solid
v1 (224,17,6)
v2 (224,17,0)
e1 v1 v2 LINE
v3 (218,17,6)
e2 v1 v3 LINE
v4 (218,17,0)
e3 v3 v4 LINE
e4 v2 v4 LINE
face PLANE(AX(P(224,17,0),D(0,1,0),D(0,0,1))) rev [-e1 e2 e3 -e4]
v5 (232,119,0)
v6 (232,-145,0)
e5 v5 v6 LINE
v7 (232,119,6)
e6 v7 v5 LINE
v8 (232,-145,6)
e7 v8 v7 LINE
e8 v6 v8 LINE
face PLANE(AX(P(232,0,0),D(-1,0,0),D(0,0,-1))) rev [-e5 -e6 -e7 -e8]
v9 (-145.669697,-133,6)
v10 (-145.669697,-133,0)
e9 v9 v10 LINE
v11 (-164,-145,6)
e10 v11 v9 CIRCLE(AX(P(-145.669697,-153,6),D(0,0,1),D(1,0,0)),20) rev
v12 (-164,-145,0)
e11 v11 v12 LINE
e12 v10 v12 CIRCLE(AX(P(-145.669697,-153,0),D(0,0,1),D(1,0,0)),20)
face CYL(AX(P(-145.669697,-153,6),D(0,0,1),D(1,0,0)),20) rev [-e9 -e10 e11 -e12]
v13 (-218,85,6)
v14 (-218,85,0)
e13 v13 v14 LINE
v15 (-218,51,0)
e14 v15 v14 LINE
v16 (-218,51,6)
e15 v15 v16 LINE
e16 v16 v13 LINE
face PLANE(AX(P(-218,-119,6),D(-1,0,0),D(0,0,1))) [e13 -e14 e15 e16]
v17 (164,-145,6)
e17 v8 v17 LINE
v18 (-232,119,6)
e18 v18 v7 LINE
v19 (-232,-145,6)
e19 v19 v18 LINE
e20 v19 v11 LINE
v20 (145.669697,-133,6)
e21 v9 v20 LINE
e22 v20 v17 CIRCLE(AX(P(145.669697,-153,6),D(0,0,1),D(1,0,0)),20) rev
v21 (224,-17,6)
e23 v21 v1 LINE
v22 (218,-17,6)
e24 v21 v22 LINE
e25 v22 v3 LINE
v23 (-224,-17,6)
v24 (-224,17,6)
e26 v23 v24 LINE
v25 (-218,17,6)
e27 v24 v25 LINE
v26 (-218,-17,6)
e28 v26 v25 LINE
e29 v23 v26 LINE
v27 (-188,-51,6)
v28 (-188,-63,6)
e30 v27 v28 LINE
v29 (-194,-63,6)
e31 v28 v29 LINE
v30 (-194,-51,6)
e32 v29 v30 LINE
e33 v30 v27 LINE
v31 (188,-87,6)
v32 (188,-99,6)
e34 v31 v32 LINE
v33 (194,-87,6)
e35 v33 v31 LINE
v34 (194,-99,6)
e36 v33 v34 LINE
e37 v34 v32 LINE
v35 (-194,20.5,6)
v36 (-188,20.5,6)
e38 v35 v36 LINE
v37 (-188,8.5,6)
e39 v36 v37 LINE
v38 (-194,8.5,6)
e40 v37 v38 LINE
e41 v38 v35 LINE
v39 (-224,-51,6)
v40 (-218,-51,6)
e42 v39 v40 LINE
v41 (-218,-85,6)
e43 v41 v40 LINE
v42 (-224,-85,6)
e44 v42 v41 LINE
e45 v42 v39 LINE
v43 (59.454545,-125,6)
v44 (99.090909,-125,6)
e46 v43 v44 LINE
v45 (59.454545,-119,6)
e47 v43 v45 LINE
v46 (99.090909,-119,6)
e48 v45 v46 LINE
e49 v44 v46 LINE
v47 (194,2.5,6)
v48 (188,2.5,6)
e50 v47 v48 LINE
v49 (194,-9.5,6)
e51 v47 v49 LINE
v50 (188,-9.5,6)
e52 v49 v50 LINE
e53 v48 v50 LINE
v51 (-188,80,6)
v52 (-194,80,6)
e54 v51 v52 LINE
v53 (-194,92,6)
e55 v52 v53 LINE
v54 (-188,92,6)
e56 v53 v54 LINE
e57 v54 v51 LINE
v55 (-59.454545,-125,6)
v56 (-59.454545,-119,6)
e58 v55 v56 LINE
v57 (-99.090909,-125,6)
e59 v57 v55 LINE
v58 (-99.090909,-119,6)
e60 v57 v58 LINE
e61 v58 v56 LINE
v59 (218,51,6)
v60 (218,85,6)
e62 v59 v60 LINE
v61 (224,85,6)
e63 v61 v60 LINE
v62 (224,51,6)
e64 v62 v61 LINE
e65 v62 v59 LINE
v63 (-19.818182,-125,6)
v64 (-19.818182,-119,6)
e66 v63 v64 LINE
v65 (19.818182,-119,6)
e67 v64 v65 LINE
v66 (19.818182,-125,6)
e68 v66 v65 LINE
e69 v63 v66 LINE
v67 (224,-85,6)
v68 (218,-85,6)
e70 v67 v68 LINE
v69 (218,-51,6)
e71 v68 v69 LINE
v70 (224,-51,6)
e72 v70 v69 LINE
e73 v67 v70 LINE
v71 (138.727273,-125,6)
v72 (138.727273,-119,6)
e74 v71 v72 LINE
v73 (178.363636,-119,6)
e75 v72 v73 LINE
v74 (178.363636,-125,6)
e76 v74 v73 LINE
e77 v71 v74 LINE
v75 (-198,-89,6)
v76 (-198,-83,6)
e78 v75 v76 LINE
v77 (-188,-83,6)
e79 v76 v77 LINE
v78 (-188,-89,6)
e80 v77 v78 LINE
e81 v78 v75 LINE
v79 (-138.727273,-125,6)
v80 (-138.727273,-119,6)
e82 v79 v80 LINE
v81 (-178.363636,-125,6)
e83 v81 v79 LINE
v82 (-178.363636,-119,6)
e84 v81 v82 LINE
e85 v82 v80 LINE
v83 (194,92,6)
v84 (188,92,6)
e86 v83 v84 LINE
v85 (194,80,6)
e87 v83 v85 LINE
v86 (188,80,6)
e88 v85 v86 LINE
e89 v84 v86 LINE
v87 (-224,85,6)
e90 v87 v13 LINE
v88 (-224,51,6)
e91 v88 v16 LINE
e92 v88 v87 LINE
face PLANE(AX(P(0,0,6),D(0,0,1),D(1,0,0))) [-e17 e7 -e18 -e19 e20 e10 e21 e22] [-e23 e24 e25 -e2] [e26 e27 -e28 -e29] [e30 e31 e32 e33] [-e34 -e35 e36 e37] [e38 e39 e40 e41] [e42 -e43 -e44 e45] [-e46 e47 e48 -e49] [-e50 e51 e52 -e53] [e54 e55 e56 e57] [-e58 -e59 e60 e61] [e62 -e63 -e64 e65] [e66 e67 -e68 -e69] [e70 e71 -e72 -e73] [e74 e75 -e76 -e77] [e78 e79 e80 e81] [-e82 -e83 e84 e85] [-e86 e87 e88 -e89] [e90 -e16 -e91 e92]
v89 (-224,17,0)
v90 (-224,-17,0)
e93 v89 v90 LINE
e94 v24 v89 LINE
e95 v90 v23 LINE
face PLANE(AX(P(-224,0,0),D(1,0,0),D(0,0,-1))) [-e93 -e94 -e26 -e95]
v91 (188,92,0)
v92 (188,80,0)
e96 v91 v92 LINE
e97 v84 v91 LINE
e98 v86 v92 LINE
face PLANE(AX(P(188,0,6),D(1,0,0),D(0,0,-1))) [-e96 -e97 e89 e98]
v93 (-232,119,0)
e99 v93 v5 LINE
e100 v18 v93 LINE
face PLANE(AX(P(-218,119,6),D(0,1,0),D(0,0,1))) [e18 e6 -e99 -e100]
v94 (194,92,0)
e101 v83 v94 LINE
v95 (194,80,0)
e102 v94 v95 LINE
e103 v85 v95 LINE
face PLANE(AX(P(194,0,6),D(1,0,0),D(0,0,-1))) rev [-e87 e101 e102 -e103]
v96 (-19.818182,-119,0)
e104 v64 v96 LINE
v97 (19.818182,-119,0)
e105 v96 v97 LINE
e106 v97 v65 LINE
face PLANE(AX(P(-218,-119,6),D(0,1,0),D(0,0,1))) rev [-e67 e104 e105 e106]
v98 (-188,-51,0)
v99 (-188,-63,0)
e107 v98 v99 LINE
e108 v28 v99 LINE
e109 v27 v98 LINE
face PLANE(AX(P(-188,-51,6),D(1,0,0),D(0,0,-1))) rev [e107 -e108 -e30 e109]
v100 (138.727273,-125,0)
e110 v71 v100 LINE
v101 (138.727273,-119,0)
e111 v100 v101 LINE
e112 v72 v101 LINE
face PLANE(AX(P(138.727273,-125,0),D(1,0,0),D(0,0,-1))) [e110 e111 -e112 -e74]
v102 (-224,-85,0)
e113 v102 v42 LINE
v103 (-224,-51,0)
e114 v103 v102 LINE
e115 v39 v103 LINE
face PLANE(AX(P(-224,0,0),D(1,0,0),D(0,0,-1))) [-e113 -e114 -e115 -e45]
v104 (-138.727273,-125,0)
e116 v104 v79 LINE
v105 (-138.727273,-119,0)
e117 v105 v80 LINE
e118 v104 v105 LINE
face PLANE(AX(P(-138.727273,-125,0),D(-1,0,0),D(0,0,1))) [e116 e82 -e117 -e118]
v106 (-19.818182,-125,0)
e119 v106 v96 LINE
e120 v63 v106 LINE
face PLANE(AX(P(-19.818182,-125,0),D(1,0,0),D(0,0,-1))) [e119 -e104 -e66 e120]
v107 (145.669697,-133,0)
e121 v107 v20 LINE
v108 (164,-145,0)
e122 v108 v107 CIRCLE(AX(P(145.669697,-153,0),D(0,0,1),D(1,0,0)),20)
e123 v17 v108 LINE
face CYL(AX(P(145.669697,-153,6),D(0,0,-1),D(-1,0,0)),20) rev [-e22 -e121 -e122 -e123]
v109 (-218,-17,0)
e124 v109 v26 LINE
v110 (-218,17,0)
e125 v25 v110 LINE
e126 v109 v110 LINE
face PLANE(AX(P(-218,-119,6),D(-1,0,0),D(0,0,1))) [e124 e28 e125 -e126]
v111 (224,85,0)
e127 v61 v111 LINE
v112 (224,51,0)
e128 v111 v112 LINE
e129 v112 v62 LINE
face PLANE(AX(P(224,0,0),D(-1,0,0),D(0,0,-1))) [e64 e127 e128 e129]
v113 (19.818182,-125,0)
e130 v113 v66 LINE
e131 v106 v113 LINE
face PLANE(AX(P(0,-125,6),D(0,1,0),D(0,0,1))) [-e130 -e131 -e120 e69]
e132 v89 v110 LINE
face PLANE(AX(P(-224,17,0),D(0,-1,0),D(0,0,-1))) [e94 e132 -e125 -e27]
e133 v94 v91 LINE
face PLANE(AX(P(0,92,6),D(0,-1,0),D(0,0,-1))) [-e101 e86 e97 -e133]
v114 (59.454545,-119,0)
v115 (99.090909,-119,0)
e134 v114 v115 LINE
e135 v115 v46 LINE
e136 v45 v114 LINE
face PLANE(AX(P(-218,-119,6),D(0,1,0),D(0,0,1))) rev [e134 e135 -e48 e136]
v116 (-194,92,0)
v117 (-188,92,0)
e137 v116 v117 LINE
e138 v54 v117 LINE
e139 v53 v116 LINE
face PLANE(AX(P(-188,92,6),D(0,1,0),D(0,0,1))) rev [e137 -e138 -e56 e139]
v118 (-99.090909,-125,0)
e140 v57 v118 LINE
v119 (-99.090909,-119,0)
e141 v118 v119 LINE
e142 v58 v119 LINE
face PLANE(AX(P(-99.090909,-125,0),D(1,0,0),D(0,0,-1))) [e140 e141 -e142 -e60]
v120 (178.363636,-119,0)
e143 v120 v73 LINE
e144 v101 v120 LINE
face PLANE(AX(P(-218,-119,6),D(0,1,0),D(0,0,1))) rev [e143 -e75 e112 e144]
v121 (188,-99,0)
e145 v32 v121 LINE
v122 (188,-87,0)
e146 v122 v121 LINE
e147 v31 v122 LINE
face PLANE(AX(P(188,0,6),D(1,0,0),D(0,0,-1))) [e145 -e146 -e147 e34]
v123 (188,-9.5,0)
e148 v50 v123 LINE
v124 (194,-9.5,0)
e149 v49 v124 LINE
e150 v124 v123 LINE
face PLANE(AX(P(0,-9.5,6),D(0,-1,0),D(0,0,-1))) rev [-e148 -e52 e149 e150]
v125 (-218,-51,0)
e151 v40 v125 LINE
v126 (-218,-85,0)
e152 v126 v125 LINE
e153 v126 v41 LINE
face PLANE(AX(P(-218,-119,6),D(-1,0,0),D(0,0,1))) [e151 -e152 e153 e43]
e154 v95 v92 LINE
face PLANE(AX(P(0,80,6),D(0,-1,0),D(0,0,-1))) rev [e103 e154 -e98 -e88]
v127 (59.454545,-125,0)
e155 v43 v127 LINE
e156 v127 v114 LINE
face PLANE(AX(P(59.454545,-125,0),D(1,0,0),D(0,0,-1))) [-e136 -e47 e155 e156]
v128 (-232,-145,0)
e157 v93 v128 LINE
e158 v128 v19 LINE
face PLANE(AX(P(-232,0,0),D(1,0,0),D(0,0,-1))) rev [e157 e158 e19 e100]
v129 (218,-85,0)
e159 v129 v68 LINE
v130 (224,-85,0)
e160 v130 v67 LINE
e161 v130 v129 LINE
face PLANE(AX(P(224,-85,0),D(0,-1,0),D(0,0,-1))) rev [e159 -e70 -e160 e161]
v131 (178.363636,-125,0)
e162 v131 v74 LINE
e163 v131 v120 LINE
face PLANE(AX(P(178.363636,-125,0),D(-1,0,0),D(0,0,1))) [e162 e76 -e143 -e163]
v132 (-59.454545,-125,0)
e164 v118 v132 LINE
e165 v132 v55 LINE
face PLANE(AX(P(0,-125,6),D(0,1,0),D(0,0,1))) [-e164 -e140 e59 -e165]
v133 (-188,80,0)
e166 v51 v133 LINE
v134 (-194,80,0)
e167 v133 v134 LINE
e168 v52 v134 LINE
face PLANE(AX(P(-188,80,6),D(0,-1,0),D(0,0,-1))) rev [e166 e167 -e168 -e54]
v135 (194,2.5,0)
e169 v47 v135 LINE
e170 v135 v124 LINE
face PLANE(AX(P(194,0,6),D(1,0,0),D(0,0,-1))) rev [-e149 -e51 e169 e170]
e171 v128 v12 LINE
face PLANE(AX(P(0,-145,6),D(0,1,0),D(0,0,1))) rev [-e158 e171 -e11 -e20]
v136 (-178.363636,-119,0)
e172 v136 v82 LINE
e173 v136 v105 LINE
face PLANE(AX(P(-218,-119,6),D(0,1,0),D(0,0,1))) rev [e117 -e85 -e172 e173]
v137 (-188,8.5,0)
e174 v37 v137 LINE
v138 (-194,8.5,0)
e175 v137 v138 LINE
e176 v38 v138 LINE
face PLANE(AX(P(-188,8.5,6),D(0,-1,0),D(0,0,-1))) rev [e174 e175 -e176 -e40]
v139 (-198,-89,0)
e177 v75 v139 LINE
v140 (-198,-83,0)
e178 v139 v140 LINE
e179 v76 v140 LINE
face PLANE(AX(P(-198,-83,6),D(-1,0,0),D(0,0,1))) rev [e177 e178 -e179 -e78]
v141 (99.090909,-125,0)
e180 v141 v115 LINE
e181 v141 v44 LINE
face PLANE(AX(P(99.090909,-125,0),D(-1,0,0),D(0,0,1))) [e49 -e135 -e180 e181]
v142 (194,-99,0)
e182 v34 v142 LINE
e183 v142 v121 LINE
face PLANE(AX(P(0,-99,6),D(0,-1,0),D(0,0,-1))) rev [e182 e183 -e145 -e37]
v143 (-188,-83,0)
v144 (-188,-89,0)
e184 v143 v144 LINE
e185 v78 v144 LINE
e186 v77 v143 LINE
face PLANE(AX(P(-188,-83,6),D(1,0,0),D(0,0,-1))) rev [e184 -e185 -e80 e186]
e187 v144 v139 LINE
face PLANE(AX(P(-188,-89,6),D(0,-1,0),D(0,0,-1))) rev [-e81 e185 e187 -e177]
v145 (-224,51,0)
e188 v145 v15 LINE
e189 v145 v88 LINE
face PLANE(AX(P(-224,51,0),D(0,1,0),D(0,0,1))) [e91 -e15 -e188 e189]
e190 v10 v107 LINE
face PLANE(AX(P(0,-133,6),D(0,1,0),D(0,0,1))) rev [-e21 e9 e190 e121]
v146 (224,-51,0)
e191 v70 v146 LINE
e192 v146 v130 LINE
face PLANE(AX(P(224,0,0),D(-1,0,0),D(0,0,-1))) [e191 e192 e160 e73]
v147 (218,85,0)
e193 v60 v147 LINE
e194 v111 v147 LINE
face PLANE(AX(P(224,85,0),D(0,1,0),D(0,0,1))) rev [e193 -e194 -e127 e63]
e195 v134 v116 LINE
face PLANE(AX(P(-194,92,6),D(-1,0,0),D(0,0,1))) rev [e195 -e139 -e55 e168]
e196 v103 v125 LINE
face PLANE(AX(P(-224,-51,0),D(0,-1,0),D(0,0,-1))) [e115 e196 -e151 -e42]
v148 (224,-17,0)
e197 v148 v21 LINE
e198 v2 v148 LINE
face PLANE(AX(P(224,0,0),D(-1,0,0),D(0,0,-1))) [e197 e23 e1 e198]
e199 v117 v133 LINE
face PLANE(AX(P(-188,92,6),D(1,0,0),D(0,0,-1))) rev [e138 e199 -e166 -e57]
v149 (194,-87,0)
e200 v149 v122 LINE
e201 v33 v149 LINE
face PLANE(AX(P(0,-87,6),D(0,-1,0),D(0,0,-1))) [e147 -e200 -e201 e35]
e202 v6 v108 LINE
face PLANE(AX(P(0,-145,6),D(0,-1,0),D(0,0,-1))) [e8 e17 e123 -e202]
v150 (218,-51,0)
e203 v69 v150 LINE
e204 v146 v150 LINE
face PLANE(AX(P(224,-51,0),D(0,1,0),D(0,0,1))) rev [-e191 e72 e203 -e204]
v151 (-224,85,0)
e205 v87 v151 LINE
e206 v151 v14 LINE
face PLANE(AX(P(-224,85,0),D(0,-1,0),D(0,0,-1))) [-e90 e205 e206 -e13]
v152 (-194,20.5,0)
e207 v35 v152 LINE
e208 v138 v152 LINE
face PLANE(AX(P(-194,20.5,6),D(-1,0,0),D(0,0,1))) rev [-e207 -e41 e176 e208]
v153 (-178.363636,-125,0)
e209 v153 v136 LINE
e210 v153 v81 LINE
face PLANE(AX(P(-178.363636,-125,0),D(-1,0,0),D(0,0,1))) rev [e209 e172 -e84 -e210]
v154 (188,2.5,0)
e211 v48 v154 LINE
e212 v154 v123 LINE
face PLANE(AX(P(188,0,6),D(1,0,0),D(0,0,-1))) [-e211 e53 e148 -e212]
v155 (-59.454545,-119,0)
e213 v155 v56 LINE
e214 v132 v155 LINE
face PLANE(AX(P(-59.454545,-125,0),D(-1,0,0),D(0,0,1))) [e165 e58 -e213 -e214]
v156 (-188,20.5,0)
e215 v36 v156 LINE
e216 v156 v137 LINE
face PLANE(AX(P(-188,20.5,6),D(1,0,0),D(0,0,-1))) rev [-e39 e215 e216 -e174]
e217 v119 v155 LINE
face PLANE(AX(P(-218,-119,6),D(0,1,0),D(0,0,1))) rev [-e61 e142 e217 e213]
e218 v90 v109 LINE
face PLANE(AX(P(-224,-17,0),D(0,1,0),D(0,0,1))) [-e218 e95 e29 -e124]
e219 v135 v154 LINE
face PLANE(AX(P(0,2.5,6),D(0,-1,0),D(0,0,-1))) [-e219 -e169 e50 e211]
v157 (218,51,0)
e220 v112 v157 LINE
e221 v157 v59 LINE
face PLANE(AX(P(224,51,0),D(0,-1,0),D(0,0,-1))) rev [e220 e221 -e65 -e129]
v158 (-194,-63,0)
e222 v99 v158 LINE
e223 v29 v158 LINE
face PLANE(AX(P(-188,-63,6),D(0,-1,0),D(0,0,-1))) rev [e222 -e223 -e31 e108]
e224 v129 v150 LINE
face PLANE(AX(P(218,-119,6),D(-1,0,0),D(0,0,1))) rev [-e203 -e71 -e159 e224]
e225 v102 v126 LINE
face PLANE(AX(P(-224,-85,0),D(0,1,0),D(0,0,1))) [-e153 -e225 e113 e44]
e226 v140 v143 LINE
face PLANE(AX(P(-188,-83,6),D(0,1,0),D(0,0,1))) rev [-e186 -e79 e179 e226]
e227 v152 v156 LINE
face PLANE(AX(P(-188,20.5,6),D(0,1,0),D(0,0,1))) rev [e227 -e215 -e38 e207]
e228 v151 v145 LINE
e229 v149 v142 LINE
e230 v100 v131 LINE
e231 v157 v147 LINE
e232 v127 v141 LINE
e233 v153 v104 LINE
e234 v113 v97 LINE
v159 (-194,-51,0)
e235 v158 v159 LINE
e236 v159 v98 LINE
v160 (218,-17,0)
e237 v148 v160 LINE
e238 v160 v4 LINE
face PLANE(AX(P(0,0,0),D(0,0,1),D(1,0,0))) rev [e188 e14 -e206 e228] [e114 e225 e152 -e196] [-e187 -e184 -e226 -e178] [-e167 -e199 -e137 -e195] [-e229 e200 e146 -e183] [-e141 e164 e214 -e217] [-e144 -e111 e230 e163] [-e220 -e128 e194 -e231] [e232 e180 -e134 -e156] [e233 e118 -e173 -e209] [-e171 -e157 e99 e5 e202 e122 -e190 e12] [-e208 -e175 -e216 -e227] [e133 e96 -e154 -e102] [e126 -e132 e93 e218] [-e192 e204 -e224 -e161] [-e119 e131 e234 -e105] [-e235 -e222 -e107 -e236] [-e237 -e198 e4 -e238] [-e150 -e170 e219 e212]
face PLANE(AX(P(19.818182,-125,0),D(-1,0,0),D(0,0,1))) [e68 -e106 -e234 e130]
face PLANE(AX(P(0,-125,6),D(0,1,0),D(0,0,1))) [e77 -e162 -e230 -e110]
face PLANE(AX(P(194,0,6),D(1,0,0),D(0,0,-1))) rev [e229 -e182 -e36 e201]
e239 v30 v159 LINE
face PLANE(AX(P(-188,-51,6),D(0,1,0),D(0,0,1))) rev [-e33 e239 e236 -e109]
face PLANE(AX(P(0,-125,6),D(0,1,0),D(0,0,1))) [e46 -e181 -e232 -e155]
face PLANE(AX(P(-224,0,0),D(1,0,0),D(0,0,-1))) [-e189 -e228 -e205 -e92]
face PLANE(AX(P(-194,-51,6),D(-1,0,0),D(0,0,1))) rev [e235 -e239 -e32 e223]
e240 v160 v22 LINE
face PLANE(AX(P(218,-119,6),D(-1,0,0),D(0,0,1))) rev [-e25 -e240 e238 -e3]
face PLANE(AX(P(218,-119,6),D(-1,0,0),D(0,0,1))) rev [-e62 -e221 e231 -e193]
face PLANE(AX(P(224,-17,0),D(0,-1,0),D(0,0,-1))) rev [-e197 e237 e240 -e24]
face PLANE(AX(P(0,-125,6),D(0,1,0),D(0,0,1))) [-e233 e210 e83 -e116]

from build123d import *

# Parameters (mm, degrees)
SKETCH1_W           = 436
SKETCH1_H           = 238
BOSS_EXTRUDE1_DEPTH = 6
SKETCH2_W           = 6
SKETCH2_H           = 12
SKETCH2_W_2         = 10
SKETCH2_H_2         = 6
CUT_EXTRUDE1_DEPTH  = 6
SKETCH3_W           = 6
SKETCH3_H           = 34
BOSS_EXTRUDE2_DEPTH = 6
SKETCH4_W           = 39.636363636
SKETCH4_H           = 6
SKETCH4_W_2         = 6
SKETCH4_W_3         = 39.636363637
BOSS_EXTRUDE3_DEPTH = 6
SKETCH5_W           = 60
SKETCH5_H           = 12
SKETCH5_W_2         = 448
SKETCH5_H_2         = 8
BOSS_EXTRUDE4_DEPTH = 6
FILLET1_R           = 20
SKETCH6_W           = 6
SKETCH6_H           = 264
BOSS_EXTRUDE5_DEPTH = 8
SKETCH7_W           = 6
SKETCH7_H           = 12
CUT_EXTRUDE2_DEPTH  = 274.651237892


with BuildPart() as part:
    # Sketch1 → Boss-Extrude1 (new body)
    with BuildSketch(Plane.XY):
        Rectangle(SKETCH1_W, SKETCH1_H)
    extrude(amount=BOSS_EXTRUDE1_DEPTH)

    # Sketch2 → Cut-Extrude1 (cut)
    with BuildSketch(Plane(origin=(0, 0, 0), x_dir=(-1, 0, 0), z_dir=(0, 0, -1))):
        with Locations((191, 86)):
            Rectangle(SKETCH2_W, SKETCH2_H)
        with Locations((191, 14.5)):
            Rectangle(SKETCH2_W, SKETCH2_H)
        with Locations((191, -57)):
            Rectangle(SKETCH2_W, SKETCH2_H)
        with Locations((193, -86)):
            Rectangle(SKETCH2_W_2, SKETCH2_H_2)
    extrude(amount=-CUT_EXTRUDE1_DEPTH, mode=Mode.SUBTRACT)

    # Sketch3 → Boss-Extrude2 (add)
    with BuildSketch(Plane.ZY.offset(218)):
        with Locations((3, 102)):
            Rectangle(SKETCH3_W, SKETCH3_H)
        with Locations((3, 34)):
            Rectangle(SKETCH3_W, SKETCH3_H)
        with Locations((3, -34)):
            Rectangle(SKETCH3_W, SKETCH3_H)
        with Locations((3, -102)):
            Rectangle(SKETCH3_W, SKETCH3_H)
    boss_extrude2 = extrude(amount=BOSS_EXTRUDE2_DEPTH)

    # Mirror1: Boss-Extrude2 across plane
    add(boss_extrude2.mirror(Plane(origin=(0, 0, 0), x_dir=(0, 0, 1), z_dir=(1, 0, 0))))

    # Sketch4 → Boss-Extrude3 (add)
    with BuildSketch(Plane.XZ.offset(119)):
        with Locations((-198.181818182, 3)):
            Rectangle(SKETCH4_W, SKETCH4_H)
        with Locations((-221, 3)):
            Rectangle(SKETCH4_W_2, SKETCH4_H)
        with Locations((-118.909090909, 3)):
            Rectangle(SKETCH4_W, SKETCH4_H)
        with Locations((-39.636363637, 3)):
            Rectangle(SKETCH4_W_3, SKETCH4_H)
        with Locations((39.636363637, 3)):
            Rectangle(SKETCH4_W_3, SKETCH4_H)
        with Locations((118.909090909, 3)):
            Rectangle(SKETCH4_W, SKETCH4_H)
        with Locations((198.181818182, 3)):
            Rectangle(SKETCH4_W, SKETCH4_H)
        with Locations((221, 3)):
            Rectangle(SKETCH4_W_2, SKETCH4_H)
    extrude(amount=BOSS_EXTRUDE3_DEPTH)

    # Sketch5 → Boss-Extrude4 (add)
    with BuildSketch(Plane(origin=(0, 0, 0), x_dir=(-1, 0, 0), z_dir=(0, 0, -1))):
        with Locations((194, -139)):
            Rectangle(SKETCH5_W, SKETCH5_H)
        with Locations((-194, -139)):
            Rectangle(SKETCH5_W, SKETCH5_H)
        with Locations((0, -129)):
            Rectangle(SKETCH5_W_2, SKETCH5_H_2)
    extrude(amount=-BOSS_EXTRUDE4_DEPTH)

    # Fillet1
    # the kernel refuses this fillet: 20 mm, written as the material it adds along each edge
    with BuildSketch(Plane(origin=(164, -133, 0), x_dir=(0, -1, 0), z_dir=(0, 0, 1))) as fillet1_piece_1:
        with BuildLine():
            CenterArc((20, -18.33030278), FILLET1_R, 113.578178478, 66.421821522)
            Line((0, -18.33030278), (-0.4, -18.33030278))
            Line((-0.4, -18.33030278), (-0.4, 0))
            Line((-0.4, 0), (0, 0.4))
            ThreePointArc((0, 0.4), (6, 0.4), (11.84, 0.366606056))
            Line((11.84, 0.366606056), (12, 0))
        make_face()
    extrude(amount=6)
    with BuildSketch(Plane(origin=(-164, -133, 0), x_dir=(1, 0, 0), z_dir=(0, 0, 1))) as fillet1_piece_2:
        with BuildLine():
            CenterArc((18.33030278, -20), FILLET1_R, 90, 66.421821522)
            Line((0, -12), (-0.366606056, -11.84))
            ThreePointArc((-0.366606056, -11.84), (-0.4, -6), (-0.4, 0))
            Line((-0.4, 0), (0, 0.4))
            Line((0, 0.4), (18.33030278, 0.4))
            Line((18.33030278, 0.4), (18.33030278, 0))
        make_face()
    extrude(amount=6)

    # Sketch6 → Boss-Extrude5 (add)
    with BuildSketch(Plane.ZY.offset(224)):
        with Locations((3, -13)):
            Rectangle(SKETCH6_W, SKETCH6_H)
    boss_extrude5 = extrude(amount=BOSS_EXTRUDE5_DEPTH)

    # Mirror2: Boss-Extrude5 across plane
    add(boss_extrude5.mirror(Plane(origin=(0, 0, 0), x_dir=(0, 0, 1), z_dir=(1, 0, 0))))

    # Sketch7 → Cut-Extrude2 (cut, through all)
    with BuildSketch(Plane(origin=(0, 0, 0), x_dir=(-1, 0, 0), z_dir=(0, 0, -1))):
        with Locations((-191, 86)):
            Rectangle(SKETCH7_W, SKETCH7_H)
        with Locations((-191, -3.5)):
            Rectangle(SKETCH7_W, SKETCH7_H)
        with Locations((-191, -93)):
            Rectangle(SKETCH7_W, SKETCH7_H)
    extrude(amount=-CUT_EXTRUDE2_DEPTH, mode=Mode.SUBTRACT)


solid = part.part
